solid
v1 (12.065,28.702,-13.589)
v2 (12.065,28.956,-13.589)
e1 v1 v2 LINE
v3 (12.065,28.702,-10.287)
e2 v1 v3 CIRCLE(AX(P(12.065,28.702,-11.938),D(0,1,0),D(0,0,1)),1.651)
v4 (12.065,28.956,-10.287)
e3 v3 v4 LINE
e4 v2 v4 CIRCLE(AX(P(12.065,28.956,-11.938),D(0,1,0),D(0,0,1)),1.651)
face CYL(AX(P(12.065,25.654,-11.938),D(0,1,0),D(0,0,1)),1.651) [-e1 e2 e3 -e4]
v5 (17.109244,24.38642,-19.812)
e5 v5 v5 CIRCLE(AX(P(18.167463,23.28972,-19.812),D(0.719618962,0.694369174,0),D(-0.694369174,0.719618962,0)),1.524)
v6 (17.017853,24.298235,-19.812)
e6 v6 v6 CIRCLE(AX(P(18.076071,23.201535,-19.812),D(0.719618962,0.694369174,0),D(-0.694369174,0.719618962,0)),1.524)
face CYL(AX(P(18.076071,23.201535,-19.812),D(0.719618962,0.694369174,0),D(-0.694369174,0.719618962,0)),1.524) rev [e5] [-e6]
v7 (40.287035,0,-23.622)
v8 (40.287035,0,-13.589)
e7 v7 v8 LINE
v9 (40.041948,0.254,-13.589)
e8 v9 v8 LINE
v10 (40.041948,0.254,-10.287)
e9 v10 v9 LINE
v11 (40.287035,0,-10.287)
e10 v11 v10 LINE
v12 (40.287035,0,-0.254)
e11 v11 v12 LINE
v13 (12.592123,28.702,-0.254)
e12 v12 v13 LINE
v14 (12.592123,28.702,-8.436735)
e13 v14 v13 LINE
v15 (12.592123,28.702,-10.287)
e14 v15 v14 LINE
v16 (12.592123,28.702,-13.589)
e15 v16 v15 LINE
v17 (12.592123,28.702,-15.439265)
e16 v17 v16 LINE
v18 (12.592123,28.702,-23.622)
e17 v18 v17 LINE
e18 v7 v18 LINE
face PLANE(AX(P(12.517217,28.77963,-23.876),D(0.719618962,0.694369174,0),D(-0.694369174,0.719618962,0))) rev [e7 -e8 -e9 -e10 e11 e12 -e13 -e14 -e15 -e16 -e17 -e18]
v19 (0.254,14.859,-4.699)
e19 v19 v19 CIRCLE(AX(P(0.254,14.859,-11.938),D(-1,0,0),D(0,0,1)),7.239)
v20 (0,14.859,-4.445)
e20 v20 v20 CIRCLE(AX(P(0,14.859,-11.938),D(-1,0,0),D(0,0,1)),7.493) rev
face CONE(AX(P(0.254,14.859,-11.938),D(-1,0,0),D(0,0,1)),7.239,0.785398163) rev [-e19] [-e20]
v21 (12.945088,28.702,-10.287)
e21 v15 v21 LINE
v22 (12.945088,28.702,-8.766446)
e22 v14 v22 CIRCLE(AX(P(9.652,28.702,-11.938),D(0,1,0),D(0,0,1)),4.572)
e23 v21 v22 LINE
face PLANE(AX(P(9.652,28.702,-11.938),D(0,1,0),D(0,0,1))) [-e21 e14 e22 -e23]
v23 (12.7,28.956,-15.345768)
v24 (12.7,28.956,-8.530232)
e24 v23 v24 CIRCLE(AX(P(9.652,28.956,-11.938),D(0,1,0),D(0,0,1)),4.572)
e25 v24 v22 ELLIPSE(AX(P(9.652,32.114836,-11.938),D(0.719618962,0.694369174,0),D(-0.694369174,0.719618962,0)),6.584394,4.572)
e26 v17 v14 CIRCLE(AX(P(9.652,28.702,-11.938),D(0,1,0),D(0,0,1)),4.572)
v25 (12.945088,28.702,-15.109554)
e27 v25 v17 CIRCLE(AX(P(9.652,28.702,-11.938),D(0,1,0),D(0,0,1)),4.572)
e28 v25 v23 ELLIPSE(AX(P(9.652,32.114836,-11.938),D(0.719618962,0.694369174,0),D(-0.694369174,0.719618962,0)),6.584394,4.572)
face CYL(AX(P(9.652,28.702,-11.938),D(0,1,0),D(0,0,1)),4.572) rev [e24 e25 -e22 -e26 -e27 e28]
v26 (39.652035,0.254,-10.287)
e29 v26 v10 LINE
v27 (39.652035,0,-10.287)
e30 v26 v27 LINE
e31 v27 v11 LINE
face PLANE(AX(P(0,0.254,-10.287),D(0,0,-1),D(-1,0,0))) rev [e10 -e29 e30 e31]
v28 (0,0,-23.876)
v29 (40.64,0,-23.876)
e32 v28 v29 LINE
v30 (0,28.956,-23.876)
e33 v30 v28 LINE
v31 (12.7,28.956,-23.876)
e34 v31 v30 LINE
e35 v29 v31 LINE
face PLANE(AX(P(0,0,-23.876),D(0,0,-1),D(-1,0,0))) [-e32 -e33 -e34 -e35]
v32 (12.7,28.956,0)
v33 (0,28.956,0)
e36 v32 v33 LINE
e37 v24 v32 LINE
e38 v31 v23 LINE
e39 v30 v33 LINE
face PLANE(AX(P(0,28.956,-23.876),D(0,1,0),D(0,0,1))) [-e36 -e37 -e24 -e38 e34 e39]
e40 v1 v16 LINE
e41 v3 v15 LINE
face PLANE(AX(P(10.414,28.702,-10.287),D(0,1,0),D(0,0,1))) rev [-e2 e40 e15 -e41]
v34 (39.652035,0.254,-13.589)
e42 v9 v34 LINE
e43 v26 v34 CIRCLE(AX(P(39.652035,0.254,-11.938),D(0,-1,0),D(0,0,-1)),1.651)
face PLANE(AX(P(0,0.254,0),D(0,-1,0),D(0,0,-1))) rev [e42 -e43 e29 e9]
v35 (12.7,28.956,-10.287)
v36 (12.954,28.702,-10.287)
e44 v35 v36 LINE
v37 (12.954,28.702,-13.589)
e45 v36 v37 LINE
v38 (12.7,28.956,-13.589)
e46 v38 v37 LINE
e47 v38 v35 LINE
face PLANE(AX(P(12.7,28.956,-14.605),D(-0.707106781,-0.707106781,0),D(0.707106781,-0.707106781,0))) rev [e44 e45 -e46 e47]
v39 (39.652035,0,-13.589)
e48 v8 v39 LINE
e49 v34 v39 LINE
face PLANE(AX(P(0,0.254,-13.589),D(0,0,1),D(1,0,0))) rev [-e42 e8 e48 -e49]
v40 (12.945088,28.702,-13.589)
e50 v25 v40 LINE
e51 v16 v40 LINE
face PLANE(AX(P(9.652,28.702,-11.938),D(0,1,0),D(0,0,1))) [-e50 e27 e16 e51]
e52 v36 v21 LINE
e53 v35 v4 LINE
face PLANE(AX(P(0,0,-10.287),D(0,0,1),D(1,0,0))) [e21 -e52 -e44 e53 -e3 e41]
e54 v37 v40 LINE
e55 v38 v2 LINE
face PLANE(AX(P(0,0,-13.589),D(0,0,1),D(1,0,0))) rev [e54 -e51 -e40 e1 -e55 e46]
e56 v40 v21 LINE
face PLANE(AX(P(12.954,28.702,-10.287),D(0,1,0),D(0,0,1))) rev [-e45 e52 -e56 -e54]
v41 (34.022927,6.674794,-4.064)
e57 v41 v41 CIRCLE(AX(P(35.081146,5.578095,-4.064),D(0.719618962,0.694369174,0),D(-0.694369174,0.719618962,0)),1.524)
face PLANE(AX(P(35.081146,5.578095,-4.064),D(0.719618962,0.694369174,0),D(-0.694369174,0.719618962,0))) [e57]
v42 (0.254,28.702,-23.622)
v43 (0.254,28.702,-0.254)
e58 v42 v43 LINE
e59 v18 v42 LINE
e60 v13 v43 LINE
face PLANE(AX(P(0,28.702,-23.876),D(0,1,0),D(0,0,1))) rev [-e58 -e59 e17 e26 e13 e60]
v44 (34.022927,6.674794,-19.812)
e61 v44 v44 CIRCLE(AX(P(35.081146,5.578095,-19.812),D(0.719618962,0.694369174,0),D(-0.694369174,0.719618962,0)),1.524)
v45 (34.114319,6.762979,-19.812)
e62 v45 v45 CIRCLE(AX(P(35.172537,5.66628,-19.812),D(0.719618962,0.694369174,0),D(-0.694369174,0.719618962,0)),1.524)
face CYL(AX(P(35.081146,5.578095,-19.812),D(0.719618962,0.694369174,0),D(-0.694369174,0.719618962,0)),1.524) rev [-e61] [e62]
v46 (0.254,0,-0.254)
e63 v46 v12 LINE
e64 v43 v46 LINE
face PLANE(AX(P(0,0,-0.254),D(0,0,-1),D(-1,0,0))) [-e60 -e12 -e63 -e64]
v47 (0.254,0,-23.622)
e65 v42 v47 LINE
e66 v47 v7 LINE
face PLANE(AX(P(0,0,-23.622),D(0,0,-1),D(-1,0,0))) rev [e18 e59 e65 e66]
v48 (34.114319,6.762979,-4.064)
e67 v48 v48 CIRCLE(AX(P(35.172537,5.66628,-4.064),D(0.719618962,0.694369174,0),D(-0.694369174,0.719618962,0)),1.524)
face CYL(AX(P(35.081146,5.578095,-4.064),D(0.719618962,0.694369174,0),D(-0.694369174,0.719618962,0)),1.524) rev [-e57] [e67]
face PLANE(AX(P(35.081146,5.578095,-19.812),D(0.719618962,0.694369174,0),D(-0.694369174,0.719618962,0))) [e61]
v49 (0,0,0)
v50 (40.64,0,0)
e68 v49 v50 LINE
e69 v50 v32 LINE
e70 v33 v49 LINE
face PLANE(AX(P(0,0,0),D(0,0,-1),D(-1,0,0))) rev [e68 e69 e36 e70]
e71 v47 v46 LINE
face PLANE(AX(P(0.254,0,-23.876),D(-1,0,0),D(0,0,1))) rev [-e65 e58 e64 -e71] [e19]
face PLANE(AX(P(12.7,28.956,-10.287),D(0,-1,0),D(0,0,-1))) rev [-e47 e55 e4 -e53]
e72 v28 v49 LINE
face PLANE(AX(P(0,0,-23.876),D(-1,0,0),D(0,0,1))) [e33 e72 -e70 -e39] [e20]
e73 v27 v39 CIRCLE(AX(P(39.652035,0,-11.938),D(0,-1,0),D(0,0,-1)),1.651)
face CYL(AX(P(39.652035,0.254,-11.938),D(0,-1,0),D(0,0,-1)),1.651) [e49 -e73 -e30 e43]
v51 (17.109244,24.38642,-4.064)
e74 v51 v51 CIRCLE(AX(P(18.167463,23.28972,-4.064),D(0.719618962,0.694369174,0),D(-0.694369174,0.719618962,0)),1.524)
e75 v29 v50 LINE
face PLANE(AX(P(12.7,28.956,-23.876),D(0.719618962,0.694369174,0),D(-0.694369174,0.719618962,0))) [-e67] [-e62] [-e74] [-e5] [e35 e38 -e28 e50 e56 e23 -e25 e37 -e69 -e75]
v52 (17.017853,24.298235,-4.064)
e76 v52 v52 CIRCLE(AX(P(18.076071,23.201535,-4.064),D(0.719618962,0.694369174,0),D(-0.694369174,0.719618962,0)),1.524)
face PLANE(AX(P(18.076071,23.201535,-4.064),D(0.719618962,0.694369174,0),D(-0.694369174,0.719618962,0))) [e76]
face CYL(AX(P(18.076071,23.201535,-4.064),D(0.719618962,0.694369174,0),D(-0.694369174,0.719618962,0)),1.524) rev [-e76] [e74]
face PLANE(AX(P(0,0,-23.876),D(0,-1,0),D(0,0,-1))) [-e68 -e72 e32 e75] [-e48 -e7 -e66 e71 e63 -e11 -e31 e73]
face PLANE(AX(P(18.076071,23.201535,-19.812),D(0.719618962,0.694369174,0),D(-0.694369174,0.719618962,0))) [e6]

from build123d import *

# Parameters (mm, degrees)
BOSS_EXTRUDE1_DEPTH = 23.876
SHELL1_T            = -0.254
SKETCH2_R           = 7.239
CUT_EXTRUDE1_DEPTH  = 0.254
CHAMFER1_SIZE       = 0.254
SKETCH3_R           = 1.524
CUT_EXTRUDE2_DEPTH  = 0.127
SKETCH9_R           = 4.572
CUT_EXTRUDE3_DEPTH  = 0.254
SKETCH18_W          = 2.286
SKETCH18_H          = 0.254
BOSS_EXTRUDE5_DEPTH = 1.651
CUT_EXTRUDE4_DEPTH  = 3.302
SKETCH20_W          = 3.302
SKETCH20_H          = 0.254
BOSS_EXTRUDE6_DEPTH = 0.254
CUT_EXTRUDE5_DEPTH  = 2.667
BOSS_EXTRUDE7_DEPTH = 0.254


with BuildPart() as part:
    # Sketch1 → Boss-Extrude1 (new body)
    with BuildSketch(Plane.XY):
        Polygon((0, 0), (40.64, 0), (12.7, 28.956), (0, 28.956), align=None)
    extrude(amount=-BOSS_EXTRUDE1_DEPTH)

    # Shell1
    shell1_openings = [part.faces().sort_by_distance(p)[0] for p in [
        (20.32, 0, -11.938),
    ]]
    offset(amount=SHELL1_T, openings=shell1_openings, kind=Kind.INTERSECTION)

    # Sketch2 → Cut-Extrude1 (cut)
    with BuildSketch(Plane.ZY):
        with Locations((-11.938, 14.859)):
            Circle(SKETCH2_R)
    extrude(amount=-CUT_EXTRUDE1_DEPTH, mode=Mode.SUBTRACT)

    # Chamfer1
    chamfer1_edges = [part.edges().sort_by_distance(p)[0] for p in [
        (0, 14.859, -19.177),
    ]]
    chamfer(chamfer1_edges, length=CHAMFER1_SIZE - 0.0001)  # a hair under: the kernel refuses the full size

    # Sketch3 → Cut-Extrude2 (cut)
    with BuildSketch(Plane(origin=(21.045482945, 20.307044947, 0), x_dir=(0, 0, -1), z_dir=(0.7196189619724784, 0.6943691738330935, 0))):
        with Locations(Location((19.812, 4.144798155, 0), (0, 0, 90))):
            Circle(SKETCH3_R)
        with Locations(Location((19.812, -20.345163225, 0), (0, 0, 90))):
            Circle(SKETCH3_R)
        with Locations(Location((4.064, 4.144798155, 0), (0, 0, 90))):
            Circle(SKETCH3_R)
        with Locations(Location((4.064, -20.345163225, 0), (0, 0, 90))):
            Circle(SKETCH3_R)
    extrude(amount=-CUT_EXTRUDE2_DEPTH, mode=Mode.SUBTRACT)

    # Sketch9 → Cut-Extrude3 (cut)
    with BuildSketch(Plane(origin=(0, 28.956, 0), x_dir=(1, 0, 0), z_dir=(0, 1, 0))):
        with Locations((9.652, 11.938)):
            Circle(SKETCH9_R)
    extrude(amount=-CUT_EXTRUDE3_DEPTH, mode=Mode.SUBTRACT)

    # Sketch18 → Boss-Extrude5 (add, symmetric)
    with BuildSketch(Plane.XY.offset(-11.938)):
        with Locations((11.557, 28.829)):
            Rectangle(SKETCH18_W, SKETCH18_H)
    extrude(amount=BOSS_EXTRUDE5_DEPTH, both=True)

    # Sketch19 → Cut-Extrude4 (cut)
    with BuildSketch(Plane(origin=(0, 28.956, 0), x_dir=(1, 0, 0), z_dir=(0, 1, 0))):
        with BuildLine():
            Line((10.414, 10.287), (12.065, 10.287))
            ThreePointArc((12.065, 10.287), (10.897566704, 10.770566704), (10.414, 11.938))
            Line((10.414, 11.938), (10.414, 10.287))
        make_face()
        with BuildLine():
            Line((10.414, 13.589), (10.414, 11.938))
            ThreePointArc((10.414, 11.938), (10.897566704, 13.105433296), (12.065, 13.589))
            Line((12.065, 13.589), (10.414, 13.589))
        make_face()
    extrude(amount=-CUT_EXTRUDE4_DEPTH, mode=Mode.SUBTRACT)

    # Sketch20 → Boss-Extrude6 (add)
    with BuildSketch(Plane(origin=(12.7, 0, 0), x_dir=(0, 0, -1), z_dir=(1, 0, 0))):
        with Locations((11.938, 28.829)):
            Rectangle(SKETCH20_W, SKETCH20_H)
    extrude(amount=BOSS_EXTRUDE6_DEPTH)

    # Sketch22 → Cut-Extrude5 (cut, symmetric)
    with BuildSketch(Plane.XY.offset(-11.938)):
        Polygon((12.7, 28.956), (12.954, 28.702), (12.954, 28.956), align=None)
    extrude(amount=CUT_EXTRUDE5_DEPTH, both=True, mode=Mode.SUBTRACT)

    # Sketch23 → Boss-Extrude7 (add)
    with BuildSketch(Plane.XZ):
        with BuildLine():
            Line((39.652035426, -13.589), (40.287035426, -13.589))
            Line((40.287035426, -13.589), (40.287035426, -10.287))
            Line((40.287035426, -10.287), (39.652035426, -10.287))
            ThreePointArc((39.652035426, -10.287), (38.001035426, -11.938), (39.652035426, -13.589))
        make_face()
    extrude(amount=-BOSS_EXTRUDE7_DEPTH)


solid = part.part
